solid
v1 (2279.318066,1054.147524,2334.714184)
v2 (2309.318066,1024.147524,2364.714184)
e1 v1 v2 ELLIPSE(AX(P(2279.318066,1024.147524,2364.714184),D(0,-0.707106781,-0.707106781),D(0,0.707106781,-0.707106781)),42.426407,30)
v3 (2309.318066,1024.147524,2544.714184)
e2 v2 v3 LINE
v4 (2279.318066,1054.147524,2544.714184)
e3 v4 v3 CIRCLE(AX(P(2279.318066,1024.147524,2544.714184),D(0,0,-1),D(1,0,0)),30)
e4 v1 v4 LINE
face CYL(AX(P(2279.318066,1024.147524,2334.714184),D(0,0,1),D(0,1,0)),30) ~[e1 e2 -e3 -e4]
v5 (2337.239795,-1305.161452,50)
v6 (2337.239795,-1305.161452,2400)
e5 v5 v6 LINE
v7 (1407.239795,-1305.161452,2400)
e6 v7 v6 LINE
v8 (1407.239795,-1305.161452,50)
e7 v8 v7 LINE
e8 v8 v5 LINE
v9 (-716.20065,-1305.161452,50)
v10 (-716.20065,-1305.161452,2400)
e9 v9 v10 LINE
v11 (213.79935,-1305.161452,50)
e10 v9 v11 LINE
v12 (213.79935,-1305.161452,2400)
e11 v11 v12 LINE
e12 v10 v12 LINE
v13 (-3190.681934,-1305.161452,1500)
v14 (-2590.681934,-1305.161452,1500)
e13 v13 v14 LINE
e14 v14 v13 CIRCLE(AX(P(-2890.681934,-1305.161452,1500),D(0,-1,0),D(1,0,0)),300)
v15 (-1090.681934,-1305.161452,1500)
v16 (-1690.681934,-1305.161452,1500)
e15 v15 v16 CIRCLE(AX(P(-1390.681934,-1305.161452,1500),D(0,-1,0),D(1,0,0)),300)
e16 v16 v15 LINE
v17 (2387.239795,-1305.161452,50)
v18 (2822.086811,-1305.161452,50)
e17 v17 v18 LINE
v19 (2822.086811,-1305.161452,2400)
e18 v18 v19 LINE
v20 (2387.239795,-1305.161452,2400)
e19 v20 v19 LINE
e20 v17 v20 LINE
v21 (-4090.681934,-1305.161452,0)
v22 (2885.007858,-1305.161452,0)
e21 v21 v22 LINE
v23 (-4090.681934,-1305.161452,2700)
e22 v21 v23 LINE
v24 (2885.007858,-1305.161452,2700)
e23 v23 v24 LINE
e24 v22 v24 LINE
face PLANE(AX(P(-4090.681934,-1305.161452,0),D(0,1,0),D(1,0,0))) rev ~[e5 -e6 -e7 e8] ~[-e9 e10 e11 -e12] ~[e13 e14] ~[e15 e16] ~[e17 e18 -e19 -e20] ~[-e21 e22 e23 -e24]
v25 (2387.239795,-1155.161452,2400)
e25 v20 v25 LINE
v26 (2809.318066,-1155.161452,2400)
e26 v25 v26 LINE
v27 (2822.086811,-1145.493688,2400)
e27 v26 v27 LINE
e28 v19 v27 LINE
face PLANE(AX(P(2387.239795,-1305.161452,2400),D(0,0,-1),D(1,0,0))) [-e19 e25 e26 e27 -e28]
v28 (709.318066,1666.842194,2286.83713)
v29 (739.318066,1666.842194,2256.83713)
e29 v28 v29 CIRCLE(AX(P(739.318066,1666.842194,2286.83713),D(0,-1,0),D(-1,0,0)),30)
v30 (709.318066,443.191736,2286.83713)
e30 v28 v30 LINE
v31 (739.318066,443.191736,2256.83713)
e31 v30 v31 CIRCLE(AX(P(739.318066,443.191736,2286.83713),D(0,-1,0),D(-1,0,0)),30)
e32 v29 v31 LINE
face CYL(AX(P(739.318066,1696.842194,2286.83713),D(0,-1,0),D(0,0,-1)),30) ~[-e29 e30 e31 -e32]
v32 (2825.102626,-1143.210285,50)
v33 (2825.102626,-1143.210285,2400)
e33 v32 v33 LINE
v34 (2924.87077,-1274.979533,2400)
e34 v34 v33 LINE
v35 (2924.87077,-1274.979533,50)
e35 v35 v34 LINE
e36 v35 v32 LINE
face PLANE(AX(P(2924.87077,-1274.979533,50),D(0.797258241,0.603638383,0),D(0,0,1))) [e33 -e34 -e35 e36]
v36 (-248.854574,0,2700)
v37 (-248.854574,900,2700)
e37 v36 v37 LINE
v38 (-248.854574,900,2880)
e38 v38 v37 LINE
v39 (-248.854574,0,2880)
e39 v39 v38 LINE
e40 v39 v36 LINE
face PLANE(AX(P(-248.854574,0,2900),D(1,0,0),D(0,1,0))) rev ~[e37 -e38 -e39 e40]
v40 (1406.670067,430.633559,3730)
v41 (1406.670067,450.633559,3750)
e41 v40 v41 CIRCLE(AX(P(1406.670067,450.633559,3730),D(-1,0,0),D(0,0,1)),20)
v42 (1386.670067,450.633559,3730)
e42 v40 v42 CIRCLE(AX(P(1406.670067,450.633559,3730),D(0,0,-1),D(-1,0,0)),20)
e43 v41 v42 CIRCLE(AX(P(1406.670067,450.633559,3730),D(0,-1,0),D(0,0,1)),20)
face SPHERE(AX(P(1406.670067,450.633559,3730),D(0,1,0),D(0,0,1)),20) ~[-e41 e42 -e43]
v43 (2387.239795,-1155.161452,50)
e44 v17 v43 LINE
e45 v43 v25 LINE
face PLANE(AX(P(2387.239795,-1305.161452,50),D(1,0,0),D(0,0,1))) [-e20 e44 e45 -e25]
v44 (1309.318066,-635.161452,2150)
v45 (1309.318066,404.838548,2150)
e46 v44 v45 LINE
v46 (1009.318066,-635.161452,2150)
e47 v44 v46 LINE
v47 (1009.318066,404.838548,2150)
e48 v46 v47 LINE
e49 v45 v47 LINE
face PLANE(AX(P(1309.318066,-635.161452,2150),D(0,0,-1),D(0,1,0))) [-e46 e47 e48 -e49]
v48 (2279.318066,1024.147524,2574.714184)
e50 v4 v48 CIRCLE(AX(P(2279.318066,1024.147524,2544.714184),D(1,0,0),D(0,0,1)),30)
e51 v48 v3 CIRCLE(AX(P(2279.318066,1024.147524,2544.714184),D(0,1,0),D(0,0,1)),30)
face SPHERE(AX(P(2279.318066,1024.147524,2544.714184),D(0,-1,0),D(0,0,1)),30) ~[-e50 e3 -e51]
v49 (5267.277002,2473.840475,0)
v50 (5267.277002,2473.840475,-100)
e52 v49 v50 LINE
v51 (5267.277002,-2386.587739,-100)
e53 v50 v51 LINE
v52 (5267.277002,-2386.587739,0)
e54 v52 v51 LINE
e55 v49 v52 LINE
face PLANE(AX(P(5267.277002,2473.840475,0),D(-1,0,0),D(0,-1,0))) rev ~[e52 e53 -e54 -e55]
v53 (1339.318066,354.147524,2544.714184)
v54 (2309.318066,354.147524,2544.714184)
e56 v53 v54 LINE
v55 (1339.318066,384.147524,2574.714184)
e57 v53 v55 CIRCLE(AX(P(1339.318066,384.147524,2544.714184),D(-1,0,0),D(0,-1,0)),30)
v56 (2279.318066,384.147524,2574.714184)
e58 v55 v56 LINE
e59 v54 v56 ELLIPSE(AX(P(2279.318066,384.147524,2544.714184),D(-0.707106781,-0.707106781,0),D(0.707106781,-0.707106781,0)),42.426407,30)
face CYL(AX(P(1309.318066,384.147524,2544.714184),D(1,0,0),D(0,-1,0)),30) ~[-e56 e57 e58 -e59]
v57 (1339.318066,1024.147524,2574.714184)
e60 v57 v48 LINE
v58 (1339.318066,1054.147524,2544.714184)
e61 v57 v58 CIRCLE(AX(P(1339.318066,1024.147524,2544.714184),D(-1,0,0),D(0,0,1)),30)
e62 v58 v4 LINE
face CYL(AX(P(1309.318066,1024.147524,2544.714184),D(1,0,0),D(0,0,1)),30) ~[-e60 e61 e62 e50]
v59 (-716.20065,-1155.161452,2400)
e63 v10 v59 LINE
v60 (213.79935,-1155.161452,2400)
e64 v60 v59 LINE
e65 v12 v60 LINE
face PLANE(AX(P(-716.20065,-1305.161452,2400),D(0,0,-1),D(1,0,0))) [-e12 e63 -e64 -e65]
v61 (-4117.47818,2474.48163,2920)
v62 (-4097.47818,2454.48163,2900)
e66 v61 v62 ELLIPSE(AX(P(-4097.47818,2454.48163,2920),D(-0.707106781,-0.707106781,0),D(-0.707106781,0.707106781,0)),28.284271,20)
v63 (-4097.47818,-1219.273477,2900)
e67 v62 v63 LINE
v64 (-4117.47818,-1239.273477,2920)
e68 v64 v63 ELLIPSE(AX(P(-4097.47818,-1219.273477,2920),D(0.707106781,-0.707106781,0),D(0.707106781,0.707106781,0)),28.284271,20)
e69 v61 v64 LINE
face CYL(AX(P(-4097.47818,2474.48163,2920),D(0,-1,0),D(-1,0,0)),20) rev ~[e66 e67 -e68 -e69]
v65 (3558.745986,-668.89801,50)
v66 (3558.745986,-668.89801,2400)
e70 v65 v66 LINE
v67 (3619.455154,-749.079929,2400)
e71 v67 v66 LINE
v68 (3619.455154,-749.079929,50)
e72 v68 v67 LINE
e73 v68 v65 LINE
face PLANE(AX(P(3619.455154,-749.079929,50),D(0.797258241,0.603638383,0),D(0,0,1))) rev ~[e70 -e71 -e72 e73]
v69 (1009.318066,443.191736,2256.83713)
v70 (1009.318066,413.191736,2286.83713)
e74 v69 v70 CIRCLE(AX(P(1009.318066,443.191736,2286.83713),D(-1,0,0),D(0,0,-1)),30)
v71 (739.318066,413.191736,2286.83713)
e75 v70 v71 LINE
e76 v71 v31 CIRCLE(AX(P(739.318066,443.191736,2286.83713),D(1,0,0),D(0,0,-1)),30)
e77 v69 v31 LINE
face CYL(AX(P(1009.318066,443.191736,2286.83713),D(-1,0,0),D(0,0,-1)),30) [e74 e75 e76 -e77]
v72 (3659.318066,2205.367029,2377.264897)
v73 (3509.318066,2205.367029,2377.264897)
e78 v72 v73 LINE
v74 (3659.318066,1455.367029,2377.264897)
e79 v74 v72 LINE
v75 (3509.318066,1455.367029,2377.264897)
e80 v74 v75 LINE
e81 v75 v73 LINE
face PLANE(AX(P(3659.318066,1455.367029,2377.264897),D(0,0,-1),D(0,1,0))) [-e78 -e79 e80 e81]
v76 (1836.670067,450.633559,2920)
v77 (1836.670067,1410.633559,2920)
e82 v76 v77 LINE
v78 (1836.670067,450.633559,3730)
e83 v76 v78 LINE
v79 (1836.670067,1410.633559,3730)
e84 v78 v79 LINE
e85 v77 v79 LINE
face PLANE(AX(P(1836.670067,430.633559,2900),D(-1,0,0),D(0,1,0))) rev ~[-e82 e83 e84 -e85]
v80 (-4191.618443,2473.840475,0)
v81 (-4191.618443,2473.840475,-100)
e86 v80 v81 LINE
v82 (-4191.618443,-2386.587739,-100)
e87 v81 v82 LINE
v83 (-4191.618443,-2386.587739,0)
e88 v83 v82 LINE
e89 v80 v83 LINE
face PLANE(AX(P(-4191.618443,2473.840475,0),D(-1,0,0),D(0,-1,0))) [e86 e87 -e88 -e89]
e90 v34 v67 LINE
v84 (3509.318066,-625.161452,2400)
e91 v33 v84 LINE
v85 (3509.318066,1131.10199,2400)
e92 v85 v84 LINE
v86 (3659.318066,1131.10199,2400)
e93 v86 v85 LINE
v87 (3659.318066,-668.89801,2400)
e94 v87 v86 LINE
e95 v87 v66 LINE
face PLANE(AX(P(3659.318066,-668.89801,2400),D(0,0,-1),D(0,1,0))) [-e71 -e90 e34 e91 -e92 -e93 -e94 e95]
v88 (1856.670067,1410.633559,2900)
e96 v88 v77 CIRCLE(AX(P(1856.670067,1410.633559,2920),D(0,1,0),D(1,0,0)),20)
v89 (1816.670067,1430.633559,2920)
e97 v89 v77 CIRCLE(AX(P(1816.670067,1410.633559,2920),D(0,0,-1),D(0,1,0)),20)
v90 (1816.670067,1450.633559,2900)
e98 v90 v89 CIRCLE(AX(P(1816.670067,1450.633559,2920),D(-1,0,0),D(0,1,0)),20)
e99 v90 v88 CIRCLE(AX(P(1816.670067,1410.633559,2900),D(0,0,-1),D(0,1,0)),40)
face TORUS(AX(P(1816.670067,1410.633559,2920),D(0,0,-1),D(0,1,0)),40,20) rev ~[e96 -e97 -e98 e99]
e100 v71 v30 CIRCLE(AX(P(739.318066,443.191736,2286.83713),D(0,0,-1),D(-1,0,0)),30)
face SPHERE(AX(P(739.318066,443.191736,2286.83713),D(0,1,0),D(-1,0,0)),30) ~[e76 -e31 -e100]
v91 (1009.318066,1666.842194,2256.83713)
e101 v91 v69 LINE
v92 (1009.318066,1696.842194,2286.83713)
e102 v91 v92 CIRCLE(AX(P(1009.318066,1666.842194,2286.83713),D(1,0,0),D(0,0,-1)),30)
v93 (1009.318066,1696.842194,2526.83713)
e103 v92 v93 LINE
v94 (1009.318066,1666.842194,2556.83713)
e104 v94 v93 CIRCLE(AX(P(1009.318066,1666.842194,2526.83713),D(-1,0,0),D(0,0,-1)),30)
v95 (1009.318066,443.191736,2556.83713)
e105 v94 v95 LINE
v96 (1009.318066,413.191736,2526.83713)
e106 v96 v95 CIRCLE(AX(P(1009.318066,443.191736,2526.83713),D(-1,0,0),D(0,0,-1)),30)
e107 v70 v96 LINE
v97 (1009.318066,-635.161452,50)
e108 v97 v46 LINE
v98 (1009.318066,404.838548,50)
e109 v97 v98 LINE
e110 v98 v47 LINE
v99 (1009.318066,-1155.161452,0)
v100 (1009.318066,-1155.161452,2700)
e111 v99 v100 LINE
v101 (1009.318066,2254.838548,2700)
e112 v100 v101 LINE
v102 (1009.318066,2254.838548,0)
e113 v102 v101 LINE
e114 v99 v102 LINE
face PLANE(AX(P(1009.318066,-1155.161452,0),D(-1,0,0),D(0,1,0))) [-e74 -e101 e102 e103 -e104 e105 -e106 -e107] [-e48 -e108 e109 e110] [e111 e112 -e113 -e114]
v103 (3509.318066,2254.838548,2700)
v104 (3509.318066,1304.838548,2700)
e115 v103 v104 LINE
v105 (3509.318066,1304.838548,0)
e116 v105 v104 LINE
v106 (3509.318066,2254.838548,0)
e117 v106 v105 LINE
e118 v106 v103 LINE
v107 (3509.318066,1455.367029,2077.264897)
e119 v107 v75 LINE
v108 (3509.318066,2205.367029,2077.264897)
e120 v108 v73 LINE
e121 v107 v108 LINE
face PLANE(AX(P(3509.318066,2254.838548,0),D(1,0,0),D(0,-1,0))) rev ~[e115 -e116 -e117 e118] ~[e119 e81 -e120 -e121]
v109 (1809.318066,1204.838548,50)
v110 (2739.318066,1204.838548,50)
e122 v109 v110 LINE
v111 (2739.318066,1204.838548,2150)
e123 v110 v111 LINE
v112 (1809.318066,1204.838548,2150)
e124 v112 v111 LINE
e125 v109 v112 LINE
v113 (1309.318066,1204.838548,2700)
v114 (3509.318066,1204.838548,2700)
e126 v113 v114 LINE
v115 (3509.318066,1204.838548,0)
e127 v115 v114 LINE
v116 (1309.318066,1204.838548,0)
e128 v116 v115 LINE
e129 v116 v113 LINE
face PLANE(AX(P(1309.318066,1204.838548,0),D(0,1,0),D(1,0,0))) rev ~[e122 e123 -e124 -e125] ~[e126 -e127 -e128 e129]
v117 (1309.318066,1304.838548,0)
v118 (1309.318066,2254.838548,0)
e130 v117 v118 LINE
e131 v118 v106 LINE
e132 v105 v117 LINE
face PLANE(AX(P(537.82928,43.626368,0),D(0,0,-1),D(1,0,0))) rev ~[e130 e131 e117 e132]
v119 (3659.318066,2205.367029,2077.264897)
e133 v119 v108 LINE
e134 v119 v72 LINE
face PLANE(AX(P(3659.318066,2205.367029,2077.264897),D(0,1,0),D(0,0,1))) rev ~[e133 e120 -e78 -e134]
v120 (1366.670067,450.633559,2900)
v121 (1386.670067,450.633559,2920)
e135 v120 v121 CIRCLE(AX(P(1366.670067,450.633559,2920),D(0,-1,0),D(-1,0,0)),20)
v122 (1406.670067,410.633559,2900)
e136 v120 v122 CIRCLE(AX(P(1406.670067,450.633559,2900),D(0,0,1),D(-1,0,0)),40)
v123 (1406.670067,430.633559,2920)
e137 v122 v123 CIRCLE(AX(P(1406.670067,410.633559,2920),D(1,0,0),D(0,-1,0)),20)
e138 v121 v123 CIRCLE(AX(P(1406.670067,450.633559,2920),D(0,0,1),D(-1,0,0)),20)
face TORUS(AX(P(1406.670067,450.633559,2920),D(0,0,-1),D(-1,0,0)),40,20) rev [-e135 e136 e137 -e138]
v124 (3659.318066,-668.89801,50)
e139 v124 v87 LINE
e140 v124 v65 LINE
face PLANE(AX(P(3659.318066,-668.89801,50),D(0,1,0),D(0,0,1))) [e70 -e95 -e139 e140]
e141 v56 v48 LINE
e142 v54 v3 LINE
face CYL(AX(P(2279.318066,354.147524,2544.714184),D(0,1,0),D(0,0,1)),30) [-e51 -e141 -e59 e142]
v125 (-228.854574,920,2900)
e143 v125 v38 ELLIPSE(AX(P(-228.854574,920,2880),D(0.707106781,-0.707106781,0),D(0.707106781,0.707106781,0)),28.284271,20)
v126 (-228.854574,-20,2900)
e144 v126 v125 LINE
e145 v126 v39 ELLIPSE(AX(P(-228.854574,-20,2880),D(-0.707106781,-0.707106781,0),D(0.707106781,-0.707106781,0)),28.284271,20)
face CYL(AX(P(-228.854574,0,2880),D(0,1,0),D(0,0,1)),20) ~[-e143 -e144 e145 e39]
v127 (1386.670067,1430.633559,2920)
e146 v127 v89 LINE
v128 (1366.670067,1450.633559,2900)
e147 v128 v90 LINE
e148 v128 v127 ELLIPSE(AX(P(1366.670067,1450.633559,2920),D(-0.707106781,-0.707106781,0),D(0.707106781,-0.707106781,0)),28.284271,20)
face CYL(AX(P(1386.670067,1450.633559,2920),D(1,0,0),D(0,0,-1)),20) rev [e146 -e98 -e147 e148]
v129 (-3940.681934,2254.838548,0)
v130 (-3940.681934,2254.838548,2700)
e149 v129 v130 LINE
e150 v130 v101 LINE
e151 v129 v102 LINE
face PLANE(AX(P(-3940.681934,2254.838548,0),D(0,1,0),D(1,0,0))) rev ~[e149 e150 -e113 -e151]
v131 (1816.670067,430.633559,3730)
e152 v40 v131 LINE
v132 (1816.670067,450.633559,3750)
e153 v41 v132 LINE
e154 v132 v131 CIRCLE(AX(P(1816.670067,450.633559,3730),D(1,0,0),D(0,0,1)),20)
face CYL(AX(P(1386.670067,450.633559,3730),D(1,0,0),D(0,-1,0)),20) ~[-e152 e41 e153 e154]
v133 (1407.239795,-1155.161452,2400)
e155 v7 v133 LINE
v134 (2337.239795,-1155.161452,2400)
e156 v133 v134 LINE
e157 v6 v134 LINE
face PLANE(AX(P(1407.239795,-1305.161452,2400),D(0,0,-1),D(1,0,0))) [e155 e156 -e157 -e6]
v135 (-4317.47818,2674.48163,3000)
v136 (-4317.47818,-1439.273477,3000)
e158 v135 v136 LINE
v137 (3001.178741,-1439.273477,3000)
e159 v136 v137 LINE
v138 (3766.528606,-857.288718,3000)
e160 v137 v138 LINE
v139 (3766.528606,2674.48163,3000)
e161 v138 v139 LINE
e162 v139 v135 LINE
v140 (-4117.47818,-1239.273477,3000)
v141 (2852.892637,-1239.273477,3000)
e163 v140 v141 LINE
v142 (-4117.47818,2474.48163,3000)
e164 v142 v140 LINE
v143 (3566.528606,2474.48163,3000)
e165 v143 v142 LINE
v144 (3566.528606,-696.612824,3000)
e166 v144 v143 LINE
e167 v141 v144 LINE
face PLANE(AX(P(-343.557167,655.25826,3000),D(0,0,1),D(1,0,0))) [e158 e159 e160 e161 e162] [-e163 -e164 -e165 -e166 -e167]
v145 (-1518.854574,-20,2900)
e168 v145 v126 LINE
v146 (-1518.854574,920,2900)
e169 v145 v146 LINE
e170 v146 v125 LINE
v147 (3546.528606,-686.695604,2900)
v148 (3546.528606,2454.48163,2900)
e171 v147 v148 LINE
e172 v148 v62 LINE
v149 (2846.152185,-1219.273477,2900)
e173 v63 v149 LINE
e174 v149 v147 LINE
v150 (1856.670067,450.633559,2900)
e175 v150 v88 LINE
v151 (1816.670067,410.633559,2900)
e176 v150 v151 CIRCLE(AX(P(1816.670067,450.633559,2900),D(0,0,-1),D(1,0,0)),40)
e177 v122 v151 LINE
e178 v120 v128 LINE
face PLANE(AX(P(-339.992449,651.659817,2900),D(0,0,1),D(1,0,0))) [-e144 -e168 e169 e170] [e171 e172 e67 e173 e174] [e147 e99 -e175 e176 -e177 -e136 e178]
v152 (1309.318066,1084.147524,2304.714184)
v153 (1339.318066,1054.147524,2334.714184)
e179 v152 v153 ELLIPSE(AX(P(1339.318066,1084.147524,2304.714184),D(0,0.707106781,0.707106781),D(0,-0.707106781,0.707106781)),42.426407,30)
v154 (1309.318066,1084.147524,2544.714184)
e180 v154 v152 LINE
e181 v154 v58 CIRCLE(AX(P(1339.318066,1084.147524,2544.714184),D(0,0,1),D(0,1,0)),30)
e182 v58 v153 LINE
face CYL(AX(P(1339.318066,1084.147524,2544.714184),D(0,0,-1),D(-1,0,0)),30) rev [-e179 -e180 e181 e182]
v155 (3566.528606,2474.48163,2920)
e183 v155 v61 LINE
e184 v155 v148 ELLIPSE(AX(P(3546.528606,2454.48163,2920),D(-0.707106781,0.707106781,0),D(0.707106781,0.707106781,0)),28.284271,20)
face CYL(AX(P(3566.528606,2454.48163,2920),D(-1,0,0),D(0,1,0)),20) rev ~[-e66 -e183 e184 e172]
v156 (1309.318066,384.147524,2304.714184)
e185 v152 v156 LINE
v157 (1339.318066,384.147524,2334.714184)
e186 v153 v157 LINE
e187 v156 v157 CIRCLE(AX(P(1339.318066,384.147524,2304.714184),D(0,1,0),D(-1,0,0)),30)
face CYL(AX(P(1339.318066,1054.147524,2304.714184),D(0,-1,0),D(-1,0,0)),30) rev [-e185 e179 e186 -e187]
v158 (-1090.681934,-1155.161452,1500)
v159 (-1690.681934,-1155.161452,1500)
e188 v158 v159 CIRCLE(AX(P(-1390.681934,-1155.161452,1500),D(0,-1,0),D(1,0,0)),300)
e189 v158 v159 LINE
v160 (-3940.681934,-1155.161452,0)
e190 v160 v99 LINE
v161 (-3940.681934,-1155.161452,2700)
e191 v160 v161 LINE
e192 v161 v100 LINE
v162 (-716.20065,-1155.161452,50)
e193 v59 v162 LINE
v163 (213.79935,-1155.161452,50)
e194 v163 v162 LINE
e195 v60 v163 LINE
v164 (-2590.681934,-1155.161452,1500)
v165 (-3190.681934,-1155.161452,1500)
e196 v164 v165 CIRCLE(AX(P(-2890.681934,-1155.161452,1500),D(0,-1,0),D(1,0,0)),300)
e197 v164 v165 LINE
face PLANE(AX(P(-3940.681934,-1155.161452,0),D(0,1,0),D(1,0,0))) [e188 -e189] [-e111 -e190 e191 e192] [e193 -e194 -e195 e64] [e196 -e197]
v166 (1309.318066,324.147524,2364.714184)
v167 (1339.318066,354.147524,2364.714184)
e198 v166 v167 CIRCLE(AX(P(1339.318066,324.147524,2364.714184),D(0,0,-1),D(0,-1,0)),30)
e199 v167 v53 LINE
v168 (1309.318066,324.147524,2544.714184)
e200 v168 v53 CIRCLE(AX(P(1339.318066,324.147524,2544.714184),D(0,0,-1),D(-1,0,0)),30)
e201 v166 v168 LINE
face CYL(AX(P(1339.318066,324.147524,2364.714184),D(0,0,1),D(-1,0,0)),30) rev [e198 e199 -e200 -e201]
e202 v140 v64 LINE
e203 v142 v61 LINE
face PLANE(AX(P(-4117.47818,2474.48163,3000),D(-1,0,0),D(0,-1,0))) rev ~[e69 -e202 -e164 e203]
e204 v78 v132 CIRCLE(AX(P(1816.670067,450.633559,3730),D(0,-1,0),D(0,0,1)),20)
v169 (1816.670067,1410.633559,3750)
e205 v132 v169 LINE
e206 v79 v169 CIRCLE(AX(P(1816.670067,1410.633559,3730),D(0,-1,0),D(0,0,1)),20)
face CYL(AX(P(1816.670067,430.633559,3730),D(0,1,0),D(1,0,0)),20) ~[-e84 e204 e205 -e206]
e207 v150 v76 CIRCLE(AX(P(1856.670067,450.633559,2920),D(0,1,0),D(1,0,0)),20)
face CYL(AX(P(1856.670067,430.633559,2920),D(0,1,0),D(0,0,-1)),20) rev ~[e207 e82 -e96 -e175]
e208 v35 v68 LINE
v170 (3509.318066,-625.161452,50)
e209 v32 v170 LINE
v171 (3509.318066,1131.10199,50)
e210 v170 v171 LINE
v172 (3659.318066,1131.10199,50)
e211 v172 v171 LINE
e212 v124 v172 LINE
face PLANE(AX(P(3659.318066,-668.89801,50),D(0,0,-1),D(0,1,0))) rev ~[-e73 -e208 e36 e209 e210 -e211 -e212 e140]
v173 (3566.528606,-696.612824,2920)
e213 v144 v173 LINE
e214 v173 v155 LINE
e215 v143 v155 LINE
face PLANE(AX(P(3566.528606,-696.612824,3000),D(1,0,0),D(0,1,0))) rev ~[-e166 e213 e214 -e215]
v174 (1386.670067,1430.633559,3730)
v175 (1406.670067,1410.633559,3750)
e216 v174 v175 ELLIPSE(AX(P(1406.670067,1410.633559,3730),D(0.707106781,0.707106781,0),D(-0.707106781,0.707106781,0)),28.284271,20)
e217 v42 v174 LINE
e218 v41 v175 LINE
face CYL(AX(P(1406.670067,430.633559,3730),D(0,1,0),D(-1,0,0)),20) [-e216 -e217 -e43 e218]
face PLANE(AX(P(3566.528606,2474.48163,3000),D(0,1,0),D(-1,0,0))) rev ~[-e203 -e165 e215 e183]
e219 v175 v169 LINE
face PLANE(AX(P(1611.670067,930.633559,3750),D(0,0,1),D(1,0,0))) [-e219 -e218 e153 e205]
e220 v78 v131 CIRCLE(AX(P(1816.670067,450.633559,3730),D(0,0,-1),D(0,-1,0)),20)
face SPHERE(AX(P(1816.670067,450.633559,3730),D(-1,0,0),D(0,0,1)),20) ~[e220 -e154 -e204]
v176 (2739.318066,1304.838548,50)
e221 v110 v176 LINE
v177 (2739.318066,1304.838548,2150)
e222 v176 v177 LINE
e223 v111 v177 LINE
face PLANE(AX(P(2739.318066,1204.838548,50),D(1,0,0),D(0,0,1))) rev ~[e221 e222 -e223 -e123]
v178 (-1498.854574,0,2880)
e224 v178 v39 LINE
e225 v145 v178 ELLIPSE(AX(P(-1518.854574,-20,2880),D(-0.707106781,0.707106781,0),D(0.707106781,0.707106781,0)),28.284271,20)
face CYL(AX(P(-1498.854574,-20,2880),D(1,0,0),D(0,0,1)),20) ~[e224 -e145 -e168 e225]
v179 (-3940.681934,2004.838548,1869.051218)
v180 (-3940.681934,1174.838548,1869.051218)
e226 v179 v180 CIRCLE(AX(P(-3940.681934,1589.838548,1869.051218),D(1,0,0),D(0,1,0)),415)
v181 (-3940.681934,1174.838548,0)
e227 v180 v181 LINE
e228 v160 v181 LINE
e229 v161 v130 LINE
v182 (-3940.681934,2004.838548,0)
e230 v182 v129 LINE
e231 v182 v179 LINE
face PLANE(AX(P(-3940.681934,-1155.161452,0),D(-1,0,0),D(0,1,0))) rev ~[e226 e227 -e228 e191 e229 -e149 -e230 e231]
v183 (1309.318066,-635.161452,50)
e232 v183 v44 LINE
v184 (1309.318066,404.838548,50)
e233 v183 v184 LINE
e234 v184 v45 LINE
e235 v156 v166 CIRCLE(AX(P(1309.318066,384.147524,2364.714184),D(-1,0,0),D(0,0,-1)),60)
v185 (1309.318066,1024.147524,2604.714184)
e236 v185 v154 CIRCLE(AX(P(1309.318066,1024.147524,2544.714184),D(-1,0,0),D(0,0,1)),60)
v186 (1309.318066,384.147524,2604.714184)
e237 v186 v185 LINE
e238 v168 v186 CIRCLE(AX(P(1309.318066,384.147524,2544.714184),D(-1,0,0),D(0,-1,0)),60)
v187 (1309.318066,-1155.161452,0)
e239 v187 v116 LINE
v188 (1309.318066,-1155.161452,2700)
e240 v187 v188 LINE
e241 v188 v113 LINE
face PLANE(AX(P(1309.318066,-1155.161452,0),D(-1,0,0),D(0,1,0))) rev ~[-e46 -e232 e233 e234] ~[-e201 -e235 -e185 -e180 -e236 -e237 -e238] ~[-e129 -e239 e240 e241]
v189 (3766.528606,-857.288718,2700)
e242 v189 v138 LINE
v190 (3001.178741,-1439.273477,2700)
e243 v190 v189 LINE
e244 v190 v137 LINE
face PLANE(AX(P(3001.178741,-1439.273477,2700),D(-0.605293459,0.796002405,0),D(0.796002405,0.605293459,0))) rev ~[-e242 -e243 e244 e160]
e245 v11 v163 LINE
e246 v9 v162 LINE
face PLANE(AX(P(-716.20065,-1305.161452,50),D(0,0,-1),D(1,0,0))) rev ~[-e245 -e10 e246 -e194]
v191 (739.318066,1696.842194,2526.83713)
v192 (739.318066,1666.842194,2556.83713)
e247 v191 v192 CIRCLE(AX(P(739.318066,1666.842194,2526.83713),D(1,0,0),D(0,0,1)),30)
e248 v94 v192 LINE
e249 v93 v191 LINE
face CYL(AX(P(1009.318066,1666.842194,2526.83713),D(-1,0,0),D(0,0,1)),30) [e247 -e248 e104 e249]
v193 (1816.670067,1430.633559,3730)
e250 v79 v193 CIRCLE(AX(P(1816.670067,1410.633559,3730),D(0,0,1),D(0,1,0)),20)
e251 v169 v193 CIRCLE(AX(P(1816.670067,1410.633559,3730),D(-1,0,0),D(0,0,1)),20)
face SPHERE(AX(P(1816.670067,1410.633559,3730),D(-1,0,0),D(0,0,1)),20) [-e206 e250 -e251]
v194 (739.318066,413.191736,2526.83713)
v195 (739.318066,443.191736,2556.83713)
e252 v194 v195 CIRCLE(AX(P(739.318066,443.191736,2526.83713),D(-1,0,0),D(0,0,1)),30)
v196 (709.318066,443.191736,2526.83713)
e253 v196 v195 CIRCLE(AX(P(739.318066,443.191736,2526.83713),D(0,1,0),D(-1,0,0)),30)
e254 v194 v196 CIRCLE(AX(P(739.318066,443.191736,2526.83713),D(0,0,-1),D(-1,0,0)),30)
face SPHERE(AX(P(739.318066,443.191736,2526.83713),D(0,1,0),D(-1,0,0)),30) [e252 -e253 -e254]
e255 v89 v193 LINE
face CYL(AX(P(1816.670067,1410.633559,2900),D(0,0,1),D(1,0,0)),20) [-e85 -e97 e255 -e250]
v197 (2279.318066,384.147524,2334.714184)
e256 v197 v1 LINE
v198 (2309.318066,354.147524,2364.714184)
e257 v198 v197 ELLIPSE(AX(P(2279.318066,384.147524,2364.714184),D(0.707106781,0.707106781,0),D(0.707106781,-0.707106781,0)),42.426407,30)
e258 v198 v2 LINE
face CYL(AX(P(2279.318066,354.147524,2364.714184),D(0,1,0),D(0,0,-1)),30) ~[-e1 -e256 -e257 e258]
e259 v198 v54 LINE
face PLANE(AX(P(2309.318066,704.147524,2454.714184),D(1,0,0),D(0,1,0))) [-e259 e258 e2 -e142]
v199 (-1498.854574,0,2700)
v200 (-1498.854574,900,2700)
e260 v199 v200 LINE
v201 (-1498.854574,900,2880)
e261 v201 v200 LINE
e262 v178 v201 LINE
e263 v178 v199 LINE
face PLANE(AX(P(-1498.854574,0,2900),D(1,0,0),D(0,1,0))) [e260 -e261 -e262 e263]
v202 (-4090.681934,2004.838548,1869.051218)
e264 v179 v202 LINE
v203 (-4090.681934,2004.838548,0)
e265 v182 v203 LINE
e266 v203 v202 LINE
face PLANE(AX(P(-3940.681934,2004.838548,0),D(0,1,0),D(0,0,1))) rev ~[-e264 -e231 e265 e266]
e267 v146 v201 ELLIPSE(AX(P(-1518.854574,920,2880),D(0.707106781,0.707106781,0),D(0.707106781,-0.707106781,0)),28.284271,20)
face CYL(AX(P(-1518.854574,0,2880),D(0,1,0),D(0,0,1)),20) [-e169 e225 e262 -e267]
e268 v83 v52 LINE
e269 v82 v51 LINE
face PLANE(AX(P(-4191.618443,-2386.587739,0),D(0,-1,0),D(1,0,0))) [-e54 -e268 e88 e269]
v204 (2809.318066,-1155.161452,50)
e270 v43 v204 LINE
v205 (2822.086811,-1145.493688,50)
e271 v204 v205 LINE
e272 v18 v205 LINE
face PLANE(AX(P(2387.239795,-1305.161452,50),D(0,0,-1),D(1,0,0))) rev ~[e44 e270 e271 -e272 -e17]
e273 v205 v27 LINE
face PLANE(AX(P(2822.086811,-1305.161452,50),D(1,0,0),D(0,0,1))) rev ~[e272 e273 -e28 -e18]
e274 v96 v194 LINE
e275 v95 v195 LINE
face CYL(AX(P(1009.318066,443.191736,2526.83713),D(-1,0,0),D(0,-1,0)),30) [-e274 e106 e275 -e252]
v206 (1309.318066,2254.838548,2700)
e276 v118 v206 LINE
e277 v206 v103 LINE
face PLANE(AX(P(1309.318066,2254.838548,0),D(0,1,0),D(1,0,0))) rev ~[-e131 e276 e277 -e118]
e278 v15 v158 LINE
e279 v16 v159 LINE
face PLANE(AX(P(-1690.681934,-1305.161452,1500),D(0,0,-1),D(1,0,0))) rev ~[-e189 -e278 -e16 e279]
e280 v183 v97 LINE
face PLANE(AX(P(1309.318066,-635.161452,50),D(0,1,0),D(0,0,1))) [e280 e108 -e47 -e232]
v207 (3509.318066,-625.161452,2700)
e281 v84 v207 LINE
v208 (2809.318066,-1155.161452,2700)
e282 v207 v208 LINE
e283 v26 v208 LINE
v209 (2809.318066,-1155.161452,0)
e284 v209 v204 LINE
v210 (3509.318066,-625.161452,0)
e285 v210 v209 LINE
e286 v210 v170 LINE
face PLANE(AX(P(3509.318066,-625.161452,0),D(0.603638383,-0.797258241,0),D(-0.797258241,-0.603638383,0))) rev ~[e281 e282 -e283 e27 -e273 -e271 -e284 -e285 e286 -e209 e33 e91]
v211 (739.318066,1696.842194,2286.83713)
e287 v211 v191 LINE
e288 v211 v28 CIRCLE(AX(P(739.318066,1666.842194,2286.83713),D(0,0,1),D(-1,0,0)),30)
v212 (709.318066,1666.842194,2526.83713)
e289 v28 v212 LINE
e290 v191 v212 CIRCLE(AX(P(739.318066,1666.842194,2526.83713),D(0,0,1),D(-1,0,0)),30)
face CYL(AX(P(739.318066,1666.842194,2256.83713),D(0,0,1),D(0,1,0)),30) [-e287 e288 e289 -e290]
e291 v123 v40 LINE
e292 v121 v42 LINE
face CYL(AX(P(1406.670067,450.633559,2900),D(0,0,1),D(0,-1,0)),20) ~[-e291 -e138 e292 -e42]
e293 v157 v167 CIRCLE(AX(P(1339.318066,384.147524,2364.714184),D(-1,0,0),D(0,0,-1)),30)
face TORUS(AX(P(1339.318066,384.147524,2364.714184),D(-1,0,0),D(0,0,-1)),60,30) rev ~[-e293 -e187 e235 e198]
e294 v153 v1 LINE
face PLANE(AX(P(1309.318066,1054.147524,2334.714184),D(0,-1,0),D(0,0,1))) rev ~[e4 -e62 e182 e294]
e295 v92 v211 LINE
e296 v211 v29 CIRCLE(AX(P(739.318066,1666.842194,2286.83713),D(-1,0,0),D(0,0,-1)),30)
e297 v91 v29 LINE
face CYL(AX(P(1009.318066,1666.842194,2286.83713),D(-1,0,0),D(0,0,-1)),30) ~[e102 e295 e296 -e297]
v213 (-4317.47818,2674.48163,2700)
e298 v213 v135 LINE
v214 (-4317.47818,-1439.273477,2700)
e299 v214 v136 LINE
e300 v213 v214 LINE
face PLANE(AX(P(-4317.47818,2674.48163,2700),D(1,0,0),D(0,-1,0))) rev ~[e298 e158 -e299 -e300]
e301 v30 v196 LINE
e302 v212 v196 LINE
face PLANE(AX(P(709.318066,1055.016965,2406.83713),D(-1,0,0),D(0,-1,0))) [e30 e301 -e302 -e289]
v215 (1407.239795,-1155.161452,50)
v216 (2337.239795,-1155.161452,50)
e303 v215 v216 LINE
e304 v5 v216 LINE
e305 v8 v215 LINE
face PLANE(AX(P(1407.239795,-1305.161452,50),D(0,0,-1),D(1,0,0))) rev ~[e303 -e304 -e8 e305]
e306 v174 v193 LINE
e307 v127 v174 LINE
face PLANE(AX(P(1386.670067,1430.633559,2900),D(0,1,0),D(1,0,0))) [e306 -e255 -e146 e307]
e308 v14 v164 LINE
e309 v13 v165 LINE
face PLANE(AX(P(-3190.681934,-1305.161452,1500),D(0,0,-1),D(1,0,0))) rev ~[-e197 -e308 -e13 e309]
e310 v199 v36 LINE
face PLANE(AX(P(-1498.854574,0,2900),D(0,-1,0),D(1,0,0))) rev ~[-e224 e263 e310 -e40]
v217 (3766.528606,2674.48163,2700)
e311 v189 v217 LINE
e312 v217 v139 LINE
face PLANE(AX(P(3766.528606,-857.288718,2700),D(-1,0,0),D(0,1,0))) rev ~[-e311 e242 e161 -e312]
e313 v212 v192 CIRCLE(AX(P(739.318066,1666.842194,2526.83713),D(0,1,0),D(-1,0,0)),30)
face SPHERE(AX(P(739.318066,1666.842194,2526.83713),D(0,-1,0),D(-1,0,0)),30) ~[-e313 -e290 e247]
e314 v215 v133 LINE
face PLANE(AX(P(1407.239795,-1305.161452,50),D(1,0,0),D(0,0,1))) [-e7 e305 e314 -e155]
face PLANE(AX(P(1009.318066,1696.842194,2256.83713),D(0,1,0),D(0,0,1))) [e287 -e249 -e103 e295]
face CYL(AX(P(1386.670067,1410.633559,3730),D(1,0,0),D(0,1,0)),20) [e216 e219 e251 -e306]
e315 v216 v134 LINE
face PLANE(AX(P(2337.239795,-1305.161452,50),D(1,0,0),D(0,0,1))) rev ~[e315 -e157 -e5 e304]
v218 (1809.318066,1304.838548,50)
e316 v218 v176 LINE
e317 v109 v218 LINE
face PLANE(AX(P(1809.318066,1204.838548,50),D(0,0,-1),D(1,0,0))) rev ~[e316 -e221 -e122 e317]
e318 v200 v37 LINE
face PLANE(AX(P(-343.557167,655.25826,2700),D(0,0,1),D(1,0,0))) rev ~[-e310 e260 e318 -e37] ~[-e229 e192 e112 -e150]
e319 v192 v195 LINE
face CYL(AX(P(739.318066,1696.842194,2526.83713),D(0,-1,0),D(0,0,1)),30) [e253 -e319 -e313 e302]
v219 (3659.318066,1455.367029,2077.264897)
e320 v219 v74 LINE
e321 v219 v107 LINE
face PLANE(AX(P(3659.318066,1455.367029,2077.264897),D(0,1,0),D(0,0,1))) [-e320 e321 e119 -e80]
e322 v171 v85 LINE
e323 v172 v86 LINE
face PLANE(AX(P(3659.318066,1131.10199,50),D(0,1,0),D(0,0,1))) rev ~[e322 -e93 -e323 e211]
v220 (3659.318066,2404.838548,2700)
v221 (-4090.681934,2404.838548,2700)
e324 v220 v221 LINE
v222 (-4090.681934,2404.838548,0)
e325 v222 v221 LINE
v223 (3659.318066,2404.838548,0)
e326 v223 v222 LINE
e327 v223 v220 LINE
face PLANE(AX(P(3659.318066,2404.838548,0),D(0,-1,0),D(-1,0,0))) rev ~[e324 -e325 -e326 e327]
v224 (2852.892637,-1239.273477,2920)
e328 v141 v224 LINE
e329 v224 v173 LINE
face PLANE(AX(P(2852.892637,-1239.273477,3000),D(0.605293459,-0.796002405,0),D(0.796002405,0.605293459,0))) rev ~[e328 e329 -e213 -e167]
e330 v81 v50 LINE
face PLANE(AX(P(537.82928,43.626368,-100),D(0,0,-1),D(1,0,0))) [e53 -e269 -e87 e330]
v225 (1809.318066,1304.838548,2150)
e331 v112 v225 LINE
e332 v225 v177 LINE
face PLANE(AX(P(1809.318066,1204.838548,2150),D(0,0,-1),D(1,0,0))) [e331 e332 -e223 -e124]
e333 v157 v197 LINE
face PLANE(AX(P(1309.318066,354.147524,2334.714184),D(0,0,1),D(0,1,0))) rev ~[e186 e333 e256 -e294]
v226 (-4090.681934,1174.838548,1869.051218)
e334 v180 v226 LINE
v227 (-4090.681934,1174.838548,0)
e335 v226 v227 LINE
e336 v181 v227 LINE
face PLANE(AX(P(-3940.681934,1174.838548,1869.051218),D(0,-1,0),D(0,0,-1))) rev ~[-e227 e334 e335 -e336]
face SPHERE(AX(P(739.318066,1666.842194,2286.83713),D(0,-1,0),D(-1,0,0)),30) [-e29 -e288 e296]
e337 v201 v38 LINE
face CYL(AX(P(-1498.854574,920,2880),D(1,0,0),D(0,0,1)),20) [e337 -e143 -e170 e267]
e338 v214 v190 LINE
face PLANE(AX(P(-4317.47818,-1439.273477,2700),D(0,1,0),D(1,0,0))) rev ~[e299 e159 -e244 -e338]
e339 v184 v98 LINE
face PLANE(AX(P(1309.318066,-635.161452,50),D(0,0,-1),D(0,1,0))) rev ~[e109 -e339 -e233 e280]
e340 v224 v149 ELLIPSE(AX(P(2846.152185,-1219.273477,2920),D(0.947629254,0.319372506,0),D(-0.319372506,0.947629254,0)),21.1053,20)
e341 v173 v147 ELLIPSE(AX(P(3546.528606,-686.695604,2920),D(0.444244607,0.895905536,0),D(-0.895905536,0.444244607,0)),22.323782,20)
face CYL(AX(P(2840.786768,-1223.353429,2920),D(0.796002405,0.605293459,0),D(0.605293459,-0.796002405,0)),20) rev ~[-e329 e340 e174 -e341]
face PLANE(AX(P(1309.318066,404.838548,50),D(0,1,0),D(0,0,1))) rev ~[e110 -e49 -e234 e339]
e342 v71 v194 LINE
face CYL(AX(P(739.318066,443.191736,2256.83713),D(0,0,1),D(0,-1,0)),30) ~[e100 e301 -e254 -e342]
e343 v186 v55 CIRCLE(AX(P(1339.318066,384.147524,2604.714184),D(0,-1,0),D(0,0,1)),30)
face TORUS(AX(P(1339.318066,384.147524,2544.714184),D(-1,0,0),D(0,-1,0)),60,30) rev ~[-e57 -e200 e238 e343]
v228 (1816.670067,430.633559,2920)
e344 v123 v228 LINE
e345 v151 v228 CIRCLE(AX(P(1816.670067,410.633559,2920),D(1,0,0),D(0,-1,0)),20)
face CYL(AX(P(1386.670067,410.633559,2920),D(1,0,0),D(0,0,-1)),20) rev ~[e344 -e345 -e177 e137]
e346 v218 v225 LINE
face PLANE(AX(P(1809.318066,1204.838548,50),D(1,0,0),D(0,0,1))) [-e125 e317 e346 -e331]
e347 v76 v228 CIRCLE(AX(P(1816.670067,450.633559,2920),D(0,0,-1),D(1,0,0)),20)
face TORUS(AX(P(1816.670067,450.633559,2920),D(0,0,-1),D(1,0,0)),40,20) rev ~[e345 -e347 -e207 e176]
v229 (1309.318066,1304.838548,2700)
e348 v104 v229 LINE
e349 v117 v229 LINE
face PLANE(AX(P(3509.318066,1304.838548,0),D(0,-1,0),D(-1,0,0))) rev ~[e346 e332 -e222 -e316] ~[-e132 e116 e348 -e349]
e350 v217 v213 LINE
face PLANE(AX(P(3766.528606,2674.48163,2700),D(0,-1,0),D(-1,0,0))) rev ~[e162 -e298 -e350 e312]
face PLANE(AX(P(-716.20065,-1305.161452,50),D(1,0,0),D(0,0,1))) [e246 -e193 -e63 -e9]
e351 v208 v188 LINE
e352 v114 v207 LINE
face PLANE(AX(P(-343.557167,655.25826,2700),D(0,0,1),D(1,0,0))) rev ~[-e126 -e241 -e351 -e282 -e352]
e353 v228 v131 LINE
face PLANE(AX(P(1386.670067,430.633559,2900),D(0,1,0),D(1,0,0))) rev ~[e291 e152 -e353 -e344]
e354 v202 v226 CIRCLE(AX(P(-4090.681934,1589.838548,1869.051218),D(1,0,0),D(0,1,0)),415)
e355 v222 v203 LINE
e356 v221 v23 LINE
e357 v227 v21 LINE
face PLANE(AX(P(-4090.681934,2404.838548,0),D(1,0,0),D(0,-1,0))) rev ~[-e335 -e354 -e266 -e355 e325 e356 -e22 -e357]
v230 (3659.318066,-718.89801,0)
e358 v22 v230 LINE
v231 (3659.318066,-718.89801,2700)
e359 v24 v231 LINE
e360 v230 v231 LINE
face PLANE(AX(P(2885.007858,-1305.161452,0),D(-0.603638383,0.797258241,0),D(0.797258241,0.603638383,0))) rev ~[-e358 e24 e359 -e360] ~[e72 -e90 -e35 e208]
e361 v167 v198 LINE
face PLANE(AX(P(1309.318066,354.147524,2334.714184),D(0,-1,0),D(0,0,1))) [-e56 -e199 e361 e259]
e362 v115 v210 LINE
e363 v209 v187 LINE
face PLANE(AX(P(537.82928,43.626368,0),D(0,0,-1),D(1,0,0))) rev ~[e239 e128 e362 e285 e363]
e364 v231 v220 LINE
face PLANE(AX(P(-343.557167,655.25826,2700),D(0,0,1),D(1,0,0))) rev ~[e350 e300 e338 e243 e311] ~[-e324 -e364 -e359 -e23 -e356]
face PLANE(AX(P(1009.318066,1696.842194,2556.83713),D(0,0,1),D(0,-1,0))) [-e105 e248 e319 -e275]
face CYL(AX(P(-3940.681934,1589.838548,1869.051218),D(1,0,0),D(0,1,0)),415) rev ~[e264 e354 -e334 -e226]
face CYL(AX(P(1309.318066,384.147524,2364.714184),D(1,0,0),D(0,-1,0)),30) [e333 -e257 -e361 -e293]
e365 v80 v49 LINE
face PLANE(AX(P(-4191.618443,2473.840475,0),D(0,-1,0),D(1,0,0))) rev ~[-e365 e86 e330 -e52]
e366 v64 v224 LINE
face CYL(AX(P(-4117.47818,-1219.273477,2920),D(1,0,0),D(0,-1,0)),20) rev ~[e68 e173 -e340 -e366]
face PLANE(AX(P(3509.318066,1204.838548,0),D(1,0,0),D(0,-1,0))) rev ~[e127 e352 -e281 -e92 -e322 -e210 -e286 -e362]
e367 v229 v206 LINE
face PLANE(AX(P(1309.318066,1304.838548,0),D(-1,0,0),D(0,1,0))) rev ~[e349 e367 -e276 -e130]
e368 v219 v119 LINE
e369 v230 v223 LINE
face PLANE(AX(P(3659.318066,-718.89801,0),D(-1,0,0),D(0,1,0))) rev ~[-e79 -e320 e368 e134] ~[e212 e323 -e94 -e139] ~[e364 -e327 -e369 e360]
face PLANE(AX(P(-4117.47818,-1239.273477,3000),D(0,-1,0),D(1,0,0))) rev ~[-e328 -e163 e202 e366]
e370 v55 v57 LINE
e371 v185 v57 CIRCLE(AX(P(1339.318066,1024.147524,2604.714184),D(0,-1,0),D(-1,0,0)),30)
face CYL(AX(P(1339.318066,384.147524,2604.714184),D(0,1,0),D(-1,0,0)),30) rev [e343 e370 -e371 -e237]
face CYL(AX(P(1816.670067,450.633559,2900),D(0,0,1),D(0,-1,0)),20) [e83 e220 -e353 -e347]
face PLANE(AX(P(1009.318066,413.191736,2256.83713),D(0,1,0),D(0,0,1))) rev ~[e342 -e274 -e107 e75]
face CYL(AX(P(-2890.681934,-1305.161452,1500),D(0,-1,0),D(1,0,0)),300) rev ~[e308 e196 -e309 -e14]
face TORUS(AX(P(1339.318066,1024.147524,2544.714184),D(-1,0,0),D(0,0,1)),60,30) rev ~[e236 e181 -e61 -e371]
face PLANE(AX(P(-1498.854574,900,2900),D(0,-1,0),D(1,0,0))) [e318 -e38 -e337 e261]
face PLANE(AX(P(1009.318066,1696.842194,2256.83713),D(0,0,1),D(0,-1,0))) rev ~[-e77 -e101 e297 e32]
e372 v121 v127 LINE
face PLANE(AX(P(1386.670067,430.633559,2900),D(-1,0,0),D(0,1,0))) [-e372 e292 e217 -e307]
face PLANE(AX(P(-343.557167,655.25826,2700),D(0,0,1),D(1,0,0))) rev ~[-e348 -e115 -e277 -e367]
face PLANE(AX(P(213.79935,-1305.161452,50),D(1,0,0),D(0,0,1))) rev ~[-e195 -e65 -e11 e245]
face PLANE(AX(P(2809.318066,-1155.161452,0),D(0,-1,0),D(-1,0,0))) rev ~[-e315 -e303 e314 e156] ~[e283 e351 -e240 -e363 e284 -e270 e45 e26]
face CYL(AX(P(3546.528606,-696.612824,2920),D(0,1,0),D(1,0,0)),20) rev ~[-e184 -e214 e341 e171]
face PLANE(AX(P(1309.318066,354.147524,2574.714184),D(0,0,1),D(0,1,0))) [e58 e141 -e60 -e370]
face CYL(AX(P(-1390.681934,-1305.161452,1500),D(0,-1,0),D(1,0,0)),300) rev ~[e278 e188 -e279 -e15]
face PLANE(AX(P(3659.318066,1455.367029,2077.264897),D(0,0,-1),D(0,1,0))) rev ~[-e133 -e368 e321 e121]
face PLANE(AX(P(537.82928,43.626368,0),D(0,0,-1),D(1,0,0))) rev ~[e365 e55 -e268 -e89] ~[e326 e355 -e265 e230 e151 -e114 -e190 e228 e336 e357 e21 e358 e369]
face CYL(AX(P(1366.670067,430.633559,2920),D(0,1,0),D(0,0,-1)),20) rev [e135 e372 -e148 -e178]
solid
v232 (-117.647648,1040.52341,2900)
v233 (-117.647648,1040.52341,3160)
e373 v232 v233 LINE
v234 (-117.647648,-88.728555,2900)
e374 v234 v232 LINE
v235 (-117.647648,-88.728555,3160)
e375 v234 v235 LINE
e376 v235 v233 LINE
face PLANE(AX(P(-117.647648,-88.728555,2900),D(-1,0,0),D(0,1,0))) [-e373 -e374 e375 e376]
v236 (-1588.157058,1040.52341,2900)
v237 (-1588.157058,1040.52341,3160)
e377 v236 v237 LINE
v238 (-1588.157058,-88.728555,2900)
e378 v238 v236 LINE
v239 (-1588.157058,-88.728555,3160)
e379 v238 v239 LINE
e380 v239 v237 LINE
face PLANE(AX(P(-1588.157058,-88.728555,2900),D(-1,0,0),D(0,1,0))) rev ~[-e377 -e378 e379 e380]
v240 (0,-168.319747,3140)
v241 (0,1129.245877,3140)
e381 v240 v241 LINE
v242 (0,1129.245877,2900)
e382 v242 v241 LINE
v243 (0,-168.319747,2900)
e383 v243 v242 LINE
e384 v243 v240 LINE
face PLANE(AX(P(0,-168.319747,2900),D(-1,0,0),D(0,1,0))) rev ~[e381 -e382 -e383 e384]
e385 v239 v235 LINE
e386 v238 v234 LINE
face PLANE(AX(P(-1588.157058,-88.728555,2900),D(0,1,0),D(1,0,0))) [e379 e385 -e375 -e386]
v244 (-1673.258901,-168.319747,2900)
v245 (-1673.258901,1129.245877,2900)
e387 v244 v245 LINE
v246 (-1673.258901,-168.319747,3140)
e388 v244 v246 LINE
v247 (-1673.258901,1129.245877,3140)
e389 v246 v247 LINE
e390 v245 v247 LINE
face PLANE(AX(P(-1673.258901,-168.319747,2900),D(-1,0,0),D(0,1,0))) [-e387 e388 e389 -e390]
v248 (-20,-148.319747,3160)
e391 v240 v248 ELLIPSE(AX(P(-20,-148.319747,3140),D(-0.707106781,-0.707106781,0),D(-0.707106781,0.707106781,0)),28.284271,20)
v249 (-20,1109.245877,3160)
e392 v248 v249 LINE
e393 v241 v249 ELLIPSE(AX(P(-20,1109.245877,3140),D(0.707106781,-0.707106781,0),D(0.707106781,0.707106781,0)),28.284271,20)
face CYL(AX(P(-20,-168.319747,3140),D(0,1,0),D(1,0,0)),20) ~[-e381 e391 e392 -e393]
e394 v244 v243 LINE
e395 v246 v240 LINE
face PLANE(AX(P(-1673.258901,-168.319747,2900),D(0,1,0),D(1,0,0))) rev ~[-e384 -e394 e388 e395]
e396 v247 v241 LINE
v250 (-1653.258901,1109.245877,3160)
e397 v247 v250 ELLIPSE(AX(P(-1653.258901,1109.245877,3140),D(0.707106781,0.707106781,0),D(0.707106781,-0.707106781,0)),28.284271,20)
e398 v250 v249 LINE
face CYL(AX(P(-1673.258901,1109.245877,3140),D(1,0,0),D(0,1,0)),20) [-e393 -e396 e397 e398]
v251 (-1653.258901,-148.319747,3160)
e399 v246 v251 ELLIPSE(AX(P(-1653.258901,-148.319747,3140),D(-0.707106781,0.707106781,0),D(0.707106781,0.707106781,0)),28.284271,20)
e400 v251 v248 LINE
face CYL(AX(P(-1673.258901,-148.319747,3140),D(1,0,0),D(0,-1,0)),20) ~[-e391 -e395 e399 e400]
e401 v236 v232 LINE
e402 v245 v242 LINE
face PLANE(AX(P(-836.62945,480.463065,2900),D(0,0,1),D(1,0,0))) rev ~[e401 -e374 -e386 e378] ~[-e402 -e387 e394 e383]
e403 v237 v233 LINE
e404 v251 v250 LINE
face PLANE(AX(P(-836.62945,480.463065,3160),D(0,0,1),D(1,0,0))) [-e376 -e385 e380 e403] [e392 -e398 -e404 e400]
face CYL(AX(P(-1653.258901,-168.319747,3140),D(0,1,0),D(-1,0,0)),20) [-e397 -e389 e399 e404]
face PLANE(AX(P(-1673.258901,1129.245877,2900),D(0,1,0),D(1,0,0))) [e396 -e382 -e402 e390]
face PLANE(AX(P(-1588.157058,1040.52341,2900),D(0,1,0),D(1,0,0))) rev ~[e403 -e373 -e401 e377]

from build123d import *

# Parameters (mm, degrees)
F0_W      = 4950
F0_H      = 3410
F1_DEPTH  = 2700
F2_W      = 930
F2_H      = 2350
F2_W_2    = 434.8470163345
F3_DEPTH  = 159.6687643912
F4_W      = 871.2163103569
F4_H      = 2350
F5_DEPTH  = 182.4564089349
F6_W      = 1800
F6_H      = 2350
F7_DEPTH  = 150
F8_W      = 1040
F8_H      = 2100
F9_DEPTH  = 300
F11_DEPTH = 150
F12_W     = 930
F12_H     = 2100
F13_DEPTH = 100
F14_W     = 700
F14_H     = 240
F15_DEPTH = 1000
F16_W     = 1283.650457859
F16_H     = 300
F17_DEPTH = 300
F18_W     = 9458.89544487
F18_H     = 4860.4282140732
F19_DEPTH = 100
F20_W     = 750
F20_H     = 300
F21_DEPTH = 150
F22_F1_R  = 30
F22_F2_R  = 30
F23_R     = 30
F25_DEPTH = 300
F27_DEPTH = 100
F28_W     = 450
F28_H     = 1000
F29_DEPTH = 850
F32_W     = 1250
F32_H     = 900
F33_DEPTH = 200
F34_W     = 1673.2589006424
F34_H     = 1297.5656241179
F34_W_2   = 1470.5094099045
F34_H_2   = 1129.2519643903
F35_DEPTH = 260
F36_R     = 20
F36_2_R   = 20


# Not quite as in the source:
# - a feature names something its author has since deleted; it is built from what else it names
# - the program builds the solid bodies; features that only make, move or delete a surface that nothing else refers to are left out


with BuildPart() as f1:
    # F0 (on Top) → F1 (new body)
    with BuildSketch(Plane.XY):
        Polygon((-4090.6819343567, 2404.8385477066), (-4090.6819343567, -1305.1614522934), (2885.0078582764, -1305.1614522934), (3659.3180656433, -718.8980095727), (3659.3180656433, 2404.8385477066), align=None)
        with Locations((-1465.6819343567, 549.8385477066)):
            Rectangle(F0_W, F0_H, mode=Mode.SUBTRACT)
        Polygon((1309.3180656433, 1304.8385477066), (1309.3180656433, 2254.8385477066), (3509.3180656433, 2254.8385477066), (3509.3180656433, 1304.8385477066), (3509.3180656433, 1204.8385477066), (3509.3180656433, -625.1614522934), (2809.3180656433, -1155.1614522934), (1309.3180656433, -1155.1614522934), (1309.3180656433, 1204.8385477066), align=None, mode=Mode.SUBTRACT)
        Polygon((1809.3180656433, 1304.8385477066), (1309.3180656433, 1304.8385477066), (1309.3180656433, 1204.8385477066), (1809.3180656433, 1204.8385477066), (3509.3180656433, 1204.8385477066), (3509.3180656433, 1304.8385477066), align=None)
    extrude(amount=F1_DEPTH)

    # F2 (on face) → F3 (cut, through all)
    with BuildSketch(Plane.XZ.offset(1305.1614522934)):
        with BuildLine():
            Line((-1690.6819343567, 1500), (-1090.6819343567, 1500))
            ThreePointArc((-1090.6819343567, 1500), (-1390.6819343567, 1800), (-1690.6819343567, 1500))
        make_face()
        with BuildLine():
            Line((-3190.6819343567, 1500), (-2590.6819343567, 1500))
            ThreePointArc((-2590.6819343567, 1500), (-2890.6819343567, 1800), (-3190.6819343567, 1500))
        make_face()
        with Locations((-251.2006497383, 1225)):
            Rectangle(F2_W, F2_H)
        with Locations((2604.6633028984, 1225)):
            Rectangle(F2_W_2, F2_H)
        with Locations((1872.2397947311, 1225)):
            Rectangle(F2_W, F2_H)
    extrude(amount=-F3_DEPTH, mode=Mode.SUBTRACT)

    # F4 (on face) → F5 (cut, through all)
    with BuildSketch(Plane(origin=(1679.3534909725, -2218.0140446806, 0), x_dir=(0.7972582411, 0.6036383826, 0), z_dir=(0.6036383826, -0.7972582411, 0))):
        with Locations((1997.8588978885, 1225)):
            Rectangle(F4_W, F4_H)
    extrude(amount=-F5_DEPTH, mode=Mode.SUBTRACT)

    # F6 (on face) → F7 (cut, through all)
    with BuildSketch(Plane.YZ.offset(3659.3180656433)):
        with Locations((231.1019904273, 1225)):
            Rectangle(F6_W, F6_H)
    extrude(amount=-F7_DEPTH, mode=Mode.SUBTRACT)

    # F8 (on face) → F9 (cut, through all)
    with BuildSketch(Plane.YZ.offset(1309.3180656433)):
        with Locations((-115.1614522934, 1100)):
            Rectangle(F8_W, F8_H)
    extrude(amount=-F9_DEPTH, mode=Mode.SUBTRACT)

    # F10 (on face) → F11 (cut, through all)
    with BuildSketch(Plane.YZ.offset(-3940.6819343567)):
        with BuildLine():
            Line((1174.8385477066, 1869.0512180328), (1174.8385477066, 0))
            Line((1174.8385477066, 0), (2004.8385477066, 0))
            Line((2004.8385477066, 0), (2004.8385477066, 1869.0512180328))
            ThreePointArc((2004.8385477066, 1869.0512180328), (1589.8385477066, 2284.0512180328), (1174.8385477066, 1869.0512180328))
        make_face()
    extrude(amount=-F11_DEPTH, mode=Mode.SUBTRACT)

    # F12 (on face) → F13 (cut, through all)
    with BuildSketch(Plane.XZ.offset(-1204.8385477066)):
        with Locations((2274.3180656433, 1100)):
            Rectangle(F12_W, F12_H)
    extrude(amount=-F13_DEPTH, mode=Mode.SUBTRACT)

    # F14 (on face) → F15 (join)
    with BuildSketch(Plane.YZ.offset(1309.3180656433)):
        with Locations((704.1475236416, 2454.7141838074)):
            Rectangle(F14_W, F14_H)
    extrude(amount=F15_DEPTH)

    # F16 (on face) → F17 (join)
    with BuildSketch(Plane(origin=(1009.3180656433, 0, 0), x_dir=(0, -1, 0), z_dir=(-1, 0, 0))):
        with Locations((-1055.016964674, 2406.8371295929)):
            Rectangle(F16_W, F16_H)
    extrude(amount=F17_DEPTH)

    # F18 (on face) → F19 (join)
    with BuildSketch(Plane(origin=(0, 0, 0), x_dir=(1, 0, 0), z_dir=(0, 0, -1))):
        with Locations((537.8292798996, -43.6263680458)):
            Rectangle(F18_W, F18_H)
    extrude(amount=F19_DEPTH)

    # F20 (on face) → F21 (cut, through all)
    with BuildSketch(Plane.YZ.offset(3659.3180656433)):
        with Locations((1830.3670287132, 2227.2648965423)):
            Rectangle(F20_W, F20_H)
    extrude(amount=-F21_DEPTH, mode=Mode.SUBTRACT)

    # F22: fillet of radius 30 on 7 edges, made by hand

    # F22_f1
    f22_f1_edges = [f1.edges().sort_by_distance(p)[0] for p in [
        (1809.3180656433, 354.1475236416, 2574.7141838074),
        (1809.3180656433, 354.1475236416, 2334.7141838074),
        (2309.3180656433, 704.1475236416, 2574.7141838074),
        (2309.3180656433, 704.1475236416, 2334.7141838074),
        (1809.3180656433, 1054.1475236416, 2574.7141838074),
        (2309.3180656433, 1054.1475236416, 2454.7141838074),
    ]]
    fillet(f22_f1_edges, radius=F22_F1_R)

    # F22_f2
    f22_f2_edges = [f1.edges().sort_by_distance(p)[0] for p in [
        (1309.3180656433, 704.1475236416, 2574.7141838074),
        (1309.3180656433, 1045.3607270772, 2565.927387243),
        (1309.3180656433, 362.934320206, 2565.927387243),
    ]]
    fillet(f22_f2_edges, radius=F22_F2_R)

    # F23
    f23_edges = [f1.edges().sort_by_distance(p)[0] for p in [
        (709.318066, 1055.016965, 2556.83713),
        (709.318066, 1055.016965, 2256.83713),
        (709.318066, 1696.842194, 2406.83713),
        (709.318066, 413.191736, 2406.83713),
        (859.318066, 413.191736, 2556.83713),
        (859.318066, 413.191736, 2256.83713),
        (859.318066, 1696.842194, 2556.83713),
        (859.318066, 1696.842194, 2256.83713),
    ]]
    fillet(f23_edges, radius=F23_R)

    # F24 (on face) → F25 (join)
    with BuildSketch(Plane.XY.offset(2700)):
        Polygon((3766.5286064148, 2674.4816303253), (-4317.4781799316, 2674.4816303253), (-4317.4781799316, -1439.2734766006), (3001.1787414551, -1439.2734766006), (3766.5286064148, -857.2887182236), align=None)
    extrude(amount=F25_DEPTH)

    # F26 (on face) → F27 (cut)
    with BuildSketch(Plane.XY.offset(3000)):
        Polygon((3566.5286064148, 2474.4816303253), (-4117.4781799316, 2474.4816303253), (-4117.4781799316, -1239.2734766006), (1505.6841762793, -1239.2734766006), (2852.8926372528, -1239.2734766006), (3566.5286064148, -696.6128241371), align=None)
    extrude(amount=-F27_DEPTH, mode=Mode.SUBTRACT)

    # F28 (on face) → F29 (join)
    with BuildSketch(Plane.XY.offset(2900)):
        with Locations((1611.6700674257, 930.6335590078)):
            Rectangle(F28_W, F28_H)
    extrude(amount=F29_DEPTH)

    # F32 (on face) → F33 (cut, through all)
    with BuildSketch(Plane.XY.offset(2900)):
        with Locations((-873.8545744768, 450)):
            Rectangle(F32_W, F32_H)
    extrude(amount=-F33_DEPTH, mode=Mode.SUBTRACT)

    # F36
    f36_edges = [f1.edges().sort_by_distance(p)[0] for p in [
        (1386.670067, 930.633559, 3750),
        (1611.670067, 430.633559, 3750),
        (1611.670067, 1430.633559, 3750),
        (1836.670067, 930.633559, 3750),
        (1836.670067, 430.633559, 3325),
        (1386.670067, 430.633559, 3325),
        (1836.670067, 1430.633559, 3325),
        (3566.528606, 888.934403, 2900),
        (3209.710622, -967.94315, 2900),
        (-275.474787, 2474.48163, 2900),
        (-632.292771, -1239.273477, 2900),
        (-4117.47818, 617.604077, 2900),
        (-873.854574, 900, 2900),
        (-1498.854574, 450, 2900),
        (-873.854574, 0, 2900),
        (-248.854574, 450, 2900),
        (1611.670067, 1430.633559, 2900),
        (1836.670067, 930.633559, 2900),
        (1386.670067, 930.633559, 2900),
        (1611.670067, 430.633559, 2900),
    ]]
    fillet(f36_edges, radius=F36_R)


with BuildPart() as f35:
    # F34 (on face) → F35 (new body)
    with BuildSketch(Plane.XY.offset(2900)):
        with Locations((-836.6294503212, 480.463065207)):
            Rectangle(F34_W, F34_H)
        with Locations((-852.9023528099, 475.8974276483)):
            Rectangle(F34_W_2, F34_H_2, mode=Mode.SUBTRACT)
    extrude(amount=F35_DEPTH)

    # F36#2
    f36_2_edges = [f35.edges().sort_by_distance(p)[0] for p in [
        (0, 480.463065, 3160),
        (-836.62945, -168.319747, 3160),
        (-836.62945, 1129.245877, 3160),
        (-1673.258901, 480.463065, 3160),
    ]]
    fillet(f36_2_edges, radius=F36_2_R)


solid = Compound([f1.part, f35.part])
